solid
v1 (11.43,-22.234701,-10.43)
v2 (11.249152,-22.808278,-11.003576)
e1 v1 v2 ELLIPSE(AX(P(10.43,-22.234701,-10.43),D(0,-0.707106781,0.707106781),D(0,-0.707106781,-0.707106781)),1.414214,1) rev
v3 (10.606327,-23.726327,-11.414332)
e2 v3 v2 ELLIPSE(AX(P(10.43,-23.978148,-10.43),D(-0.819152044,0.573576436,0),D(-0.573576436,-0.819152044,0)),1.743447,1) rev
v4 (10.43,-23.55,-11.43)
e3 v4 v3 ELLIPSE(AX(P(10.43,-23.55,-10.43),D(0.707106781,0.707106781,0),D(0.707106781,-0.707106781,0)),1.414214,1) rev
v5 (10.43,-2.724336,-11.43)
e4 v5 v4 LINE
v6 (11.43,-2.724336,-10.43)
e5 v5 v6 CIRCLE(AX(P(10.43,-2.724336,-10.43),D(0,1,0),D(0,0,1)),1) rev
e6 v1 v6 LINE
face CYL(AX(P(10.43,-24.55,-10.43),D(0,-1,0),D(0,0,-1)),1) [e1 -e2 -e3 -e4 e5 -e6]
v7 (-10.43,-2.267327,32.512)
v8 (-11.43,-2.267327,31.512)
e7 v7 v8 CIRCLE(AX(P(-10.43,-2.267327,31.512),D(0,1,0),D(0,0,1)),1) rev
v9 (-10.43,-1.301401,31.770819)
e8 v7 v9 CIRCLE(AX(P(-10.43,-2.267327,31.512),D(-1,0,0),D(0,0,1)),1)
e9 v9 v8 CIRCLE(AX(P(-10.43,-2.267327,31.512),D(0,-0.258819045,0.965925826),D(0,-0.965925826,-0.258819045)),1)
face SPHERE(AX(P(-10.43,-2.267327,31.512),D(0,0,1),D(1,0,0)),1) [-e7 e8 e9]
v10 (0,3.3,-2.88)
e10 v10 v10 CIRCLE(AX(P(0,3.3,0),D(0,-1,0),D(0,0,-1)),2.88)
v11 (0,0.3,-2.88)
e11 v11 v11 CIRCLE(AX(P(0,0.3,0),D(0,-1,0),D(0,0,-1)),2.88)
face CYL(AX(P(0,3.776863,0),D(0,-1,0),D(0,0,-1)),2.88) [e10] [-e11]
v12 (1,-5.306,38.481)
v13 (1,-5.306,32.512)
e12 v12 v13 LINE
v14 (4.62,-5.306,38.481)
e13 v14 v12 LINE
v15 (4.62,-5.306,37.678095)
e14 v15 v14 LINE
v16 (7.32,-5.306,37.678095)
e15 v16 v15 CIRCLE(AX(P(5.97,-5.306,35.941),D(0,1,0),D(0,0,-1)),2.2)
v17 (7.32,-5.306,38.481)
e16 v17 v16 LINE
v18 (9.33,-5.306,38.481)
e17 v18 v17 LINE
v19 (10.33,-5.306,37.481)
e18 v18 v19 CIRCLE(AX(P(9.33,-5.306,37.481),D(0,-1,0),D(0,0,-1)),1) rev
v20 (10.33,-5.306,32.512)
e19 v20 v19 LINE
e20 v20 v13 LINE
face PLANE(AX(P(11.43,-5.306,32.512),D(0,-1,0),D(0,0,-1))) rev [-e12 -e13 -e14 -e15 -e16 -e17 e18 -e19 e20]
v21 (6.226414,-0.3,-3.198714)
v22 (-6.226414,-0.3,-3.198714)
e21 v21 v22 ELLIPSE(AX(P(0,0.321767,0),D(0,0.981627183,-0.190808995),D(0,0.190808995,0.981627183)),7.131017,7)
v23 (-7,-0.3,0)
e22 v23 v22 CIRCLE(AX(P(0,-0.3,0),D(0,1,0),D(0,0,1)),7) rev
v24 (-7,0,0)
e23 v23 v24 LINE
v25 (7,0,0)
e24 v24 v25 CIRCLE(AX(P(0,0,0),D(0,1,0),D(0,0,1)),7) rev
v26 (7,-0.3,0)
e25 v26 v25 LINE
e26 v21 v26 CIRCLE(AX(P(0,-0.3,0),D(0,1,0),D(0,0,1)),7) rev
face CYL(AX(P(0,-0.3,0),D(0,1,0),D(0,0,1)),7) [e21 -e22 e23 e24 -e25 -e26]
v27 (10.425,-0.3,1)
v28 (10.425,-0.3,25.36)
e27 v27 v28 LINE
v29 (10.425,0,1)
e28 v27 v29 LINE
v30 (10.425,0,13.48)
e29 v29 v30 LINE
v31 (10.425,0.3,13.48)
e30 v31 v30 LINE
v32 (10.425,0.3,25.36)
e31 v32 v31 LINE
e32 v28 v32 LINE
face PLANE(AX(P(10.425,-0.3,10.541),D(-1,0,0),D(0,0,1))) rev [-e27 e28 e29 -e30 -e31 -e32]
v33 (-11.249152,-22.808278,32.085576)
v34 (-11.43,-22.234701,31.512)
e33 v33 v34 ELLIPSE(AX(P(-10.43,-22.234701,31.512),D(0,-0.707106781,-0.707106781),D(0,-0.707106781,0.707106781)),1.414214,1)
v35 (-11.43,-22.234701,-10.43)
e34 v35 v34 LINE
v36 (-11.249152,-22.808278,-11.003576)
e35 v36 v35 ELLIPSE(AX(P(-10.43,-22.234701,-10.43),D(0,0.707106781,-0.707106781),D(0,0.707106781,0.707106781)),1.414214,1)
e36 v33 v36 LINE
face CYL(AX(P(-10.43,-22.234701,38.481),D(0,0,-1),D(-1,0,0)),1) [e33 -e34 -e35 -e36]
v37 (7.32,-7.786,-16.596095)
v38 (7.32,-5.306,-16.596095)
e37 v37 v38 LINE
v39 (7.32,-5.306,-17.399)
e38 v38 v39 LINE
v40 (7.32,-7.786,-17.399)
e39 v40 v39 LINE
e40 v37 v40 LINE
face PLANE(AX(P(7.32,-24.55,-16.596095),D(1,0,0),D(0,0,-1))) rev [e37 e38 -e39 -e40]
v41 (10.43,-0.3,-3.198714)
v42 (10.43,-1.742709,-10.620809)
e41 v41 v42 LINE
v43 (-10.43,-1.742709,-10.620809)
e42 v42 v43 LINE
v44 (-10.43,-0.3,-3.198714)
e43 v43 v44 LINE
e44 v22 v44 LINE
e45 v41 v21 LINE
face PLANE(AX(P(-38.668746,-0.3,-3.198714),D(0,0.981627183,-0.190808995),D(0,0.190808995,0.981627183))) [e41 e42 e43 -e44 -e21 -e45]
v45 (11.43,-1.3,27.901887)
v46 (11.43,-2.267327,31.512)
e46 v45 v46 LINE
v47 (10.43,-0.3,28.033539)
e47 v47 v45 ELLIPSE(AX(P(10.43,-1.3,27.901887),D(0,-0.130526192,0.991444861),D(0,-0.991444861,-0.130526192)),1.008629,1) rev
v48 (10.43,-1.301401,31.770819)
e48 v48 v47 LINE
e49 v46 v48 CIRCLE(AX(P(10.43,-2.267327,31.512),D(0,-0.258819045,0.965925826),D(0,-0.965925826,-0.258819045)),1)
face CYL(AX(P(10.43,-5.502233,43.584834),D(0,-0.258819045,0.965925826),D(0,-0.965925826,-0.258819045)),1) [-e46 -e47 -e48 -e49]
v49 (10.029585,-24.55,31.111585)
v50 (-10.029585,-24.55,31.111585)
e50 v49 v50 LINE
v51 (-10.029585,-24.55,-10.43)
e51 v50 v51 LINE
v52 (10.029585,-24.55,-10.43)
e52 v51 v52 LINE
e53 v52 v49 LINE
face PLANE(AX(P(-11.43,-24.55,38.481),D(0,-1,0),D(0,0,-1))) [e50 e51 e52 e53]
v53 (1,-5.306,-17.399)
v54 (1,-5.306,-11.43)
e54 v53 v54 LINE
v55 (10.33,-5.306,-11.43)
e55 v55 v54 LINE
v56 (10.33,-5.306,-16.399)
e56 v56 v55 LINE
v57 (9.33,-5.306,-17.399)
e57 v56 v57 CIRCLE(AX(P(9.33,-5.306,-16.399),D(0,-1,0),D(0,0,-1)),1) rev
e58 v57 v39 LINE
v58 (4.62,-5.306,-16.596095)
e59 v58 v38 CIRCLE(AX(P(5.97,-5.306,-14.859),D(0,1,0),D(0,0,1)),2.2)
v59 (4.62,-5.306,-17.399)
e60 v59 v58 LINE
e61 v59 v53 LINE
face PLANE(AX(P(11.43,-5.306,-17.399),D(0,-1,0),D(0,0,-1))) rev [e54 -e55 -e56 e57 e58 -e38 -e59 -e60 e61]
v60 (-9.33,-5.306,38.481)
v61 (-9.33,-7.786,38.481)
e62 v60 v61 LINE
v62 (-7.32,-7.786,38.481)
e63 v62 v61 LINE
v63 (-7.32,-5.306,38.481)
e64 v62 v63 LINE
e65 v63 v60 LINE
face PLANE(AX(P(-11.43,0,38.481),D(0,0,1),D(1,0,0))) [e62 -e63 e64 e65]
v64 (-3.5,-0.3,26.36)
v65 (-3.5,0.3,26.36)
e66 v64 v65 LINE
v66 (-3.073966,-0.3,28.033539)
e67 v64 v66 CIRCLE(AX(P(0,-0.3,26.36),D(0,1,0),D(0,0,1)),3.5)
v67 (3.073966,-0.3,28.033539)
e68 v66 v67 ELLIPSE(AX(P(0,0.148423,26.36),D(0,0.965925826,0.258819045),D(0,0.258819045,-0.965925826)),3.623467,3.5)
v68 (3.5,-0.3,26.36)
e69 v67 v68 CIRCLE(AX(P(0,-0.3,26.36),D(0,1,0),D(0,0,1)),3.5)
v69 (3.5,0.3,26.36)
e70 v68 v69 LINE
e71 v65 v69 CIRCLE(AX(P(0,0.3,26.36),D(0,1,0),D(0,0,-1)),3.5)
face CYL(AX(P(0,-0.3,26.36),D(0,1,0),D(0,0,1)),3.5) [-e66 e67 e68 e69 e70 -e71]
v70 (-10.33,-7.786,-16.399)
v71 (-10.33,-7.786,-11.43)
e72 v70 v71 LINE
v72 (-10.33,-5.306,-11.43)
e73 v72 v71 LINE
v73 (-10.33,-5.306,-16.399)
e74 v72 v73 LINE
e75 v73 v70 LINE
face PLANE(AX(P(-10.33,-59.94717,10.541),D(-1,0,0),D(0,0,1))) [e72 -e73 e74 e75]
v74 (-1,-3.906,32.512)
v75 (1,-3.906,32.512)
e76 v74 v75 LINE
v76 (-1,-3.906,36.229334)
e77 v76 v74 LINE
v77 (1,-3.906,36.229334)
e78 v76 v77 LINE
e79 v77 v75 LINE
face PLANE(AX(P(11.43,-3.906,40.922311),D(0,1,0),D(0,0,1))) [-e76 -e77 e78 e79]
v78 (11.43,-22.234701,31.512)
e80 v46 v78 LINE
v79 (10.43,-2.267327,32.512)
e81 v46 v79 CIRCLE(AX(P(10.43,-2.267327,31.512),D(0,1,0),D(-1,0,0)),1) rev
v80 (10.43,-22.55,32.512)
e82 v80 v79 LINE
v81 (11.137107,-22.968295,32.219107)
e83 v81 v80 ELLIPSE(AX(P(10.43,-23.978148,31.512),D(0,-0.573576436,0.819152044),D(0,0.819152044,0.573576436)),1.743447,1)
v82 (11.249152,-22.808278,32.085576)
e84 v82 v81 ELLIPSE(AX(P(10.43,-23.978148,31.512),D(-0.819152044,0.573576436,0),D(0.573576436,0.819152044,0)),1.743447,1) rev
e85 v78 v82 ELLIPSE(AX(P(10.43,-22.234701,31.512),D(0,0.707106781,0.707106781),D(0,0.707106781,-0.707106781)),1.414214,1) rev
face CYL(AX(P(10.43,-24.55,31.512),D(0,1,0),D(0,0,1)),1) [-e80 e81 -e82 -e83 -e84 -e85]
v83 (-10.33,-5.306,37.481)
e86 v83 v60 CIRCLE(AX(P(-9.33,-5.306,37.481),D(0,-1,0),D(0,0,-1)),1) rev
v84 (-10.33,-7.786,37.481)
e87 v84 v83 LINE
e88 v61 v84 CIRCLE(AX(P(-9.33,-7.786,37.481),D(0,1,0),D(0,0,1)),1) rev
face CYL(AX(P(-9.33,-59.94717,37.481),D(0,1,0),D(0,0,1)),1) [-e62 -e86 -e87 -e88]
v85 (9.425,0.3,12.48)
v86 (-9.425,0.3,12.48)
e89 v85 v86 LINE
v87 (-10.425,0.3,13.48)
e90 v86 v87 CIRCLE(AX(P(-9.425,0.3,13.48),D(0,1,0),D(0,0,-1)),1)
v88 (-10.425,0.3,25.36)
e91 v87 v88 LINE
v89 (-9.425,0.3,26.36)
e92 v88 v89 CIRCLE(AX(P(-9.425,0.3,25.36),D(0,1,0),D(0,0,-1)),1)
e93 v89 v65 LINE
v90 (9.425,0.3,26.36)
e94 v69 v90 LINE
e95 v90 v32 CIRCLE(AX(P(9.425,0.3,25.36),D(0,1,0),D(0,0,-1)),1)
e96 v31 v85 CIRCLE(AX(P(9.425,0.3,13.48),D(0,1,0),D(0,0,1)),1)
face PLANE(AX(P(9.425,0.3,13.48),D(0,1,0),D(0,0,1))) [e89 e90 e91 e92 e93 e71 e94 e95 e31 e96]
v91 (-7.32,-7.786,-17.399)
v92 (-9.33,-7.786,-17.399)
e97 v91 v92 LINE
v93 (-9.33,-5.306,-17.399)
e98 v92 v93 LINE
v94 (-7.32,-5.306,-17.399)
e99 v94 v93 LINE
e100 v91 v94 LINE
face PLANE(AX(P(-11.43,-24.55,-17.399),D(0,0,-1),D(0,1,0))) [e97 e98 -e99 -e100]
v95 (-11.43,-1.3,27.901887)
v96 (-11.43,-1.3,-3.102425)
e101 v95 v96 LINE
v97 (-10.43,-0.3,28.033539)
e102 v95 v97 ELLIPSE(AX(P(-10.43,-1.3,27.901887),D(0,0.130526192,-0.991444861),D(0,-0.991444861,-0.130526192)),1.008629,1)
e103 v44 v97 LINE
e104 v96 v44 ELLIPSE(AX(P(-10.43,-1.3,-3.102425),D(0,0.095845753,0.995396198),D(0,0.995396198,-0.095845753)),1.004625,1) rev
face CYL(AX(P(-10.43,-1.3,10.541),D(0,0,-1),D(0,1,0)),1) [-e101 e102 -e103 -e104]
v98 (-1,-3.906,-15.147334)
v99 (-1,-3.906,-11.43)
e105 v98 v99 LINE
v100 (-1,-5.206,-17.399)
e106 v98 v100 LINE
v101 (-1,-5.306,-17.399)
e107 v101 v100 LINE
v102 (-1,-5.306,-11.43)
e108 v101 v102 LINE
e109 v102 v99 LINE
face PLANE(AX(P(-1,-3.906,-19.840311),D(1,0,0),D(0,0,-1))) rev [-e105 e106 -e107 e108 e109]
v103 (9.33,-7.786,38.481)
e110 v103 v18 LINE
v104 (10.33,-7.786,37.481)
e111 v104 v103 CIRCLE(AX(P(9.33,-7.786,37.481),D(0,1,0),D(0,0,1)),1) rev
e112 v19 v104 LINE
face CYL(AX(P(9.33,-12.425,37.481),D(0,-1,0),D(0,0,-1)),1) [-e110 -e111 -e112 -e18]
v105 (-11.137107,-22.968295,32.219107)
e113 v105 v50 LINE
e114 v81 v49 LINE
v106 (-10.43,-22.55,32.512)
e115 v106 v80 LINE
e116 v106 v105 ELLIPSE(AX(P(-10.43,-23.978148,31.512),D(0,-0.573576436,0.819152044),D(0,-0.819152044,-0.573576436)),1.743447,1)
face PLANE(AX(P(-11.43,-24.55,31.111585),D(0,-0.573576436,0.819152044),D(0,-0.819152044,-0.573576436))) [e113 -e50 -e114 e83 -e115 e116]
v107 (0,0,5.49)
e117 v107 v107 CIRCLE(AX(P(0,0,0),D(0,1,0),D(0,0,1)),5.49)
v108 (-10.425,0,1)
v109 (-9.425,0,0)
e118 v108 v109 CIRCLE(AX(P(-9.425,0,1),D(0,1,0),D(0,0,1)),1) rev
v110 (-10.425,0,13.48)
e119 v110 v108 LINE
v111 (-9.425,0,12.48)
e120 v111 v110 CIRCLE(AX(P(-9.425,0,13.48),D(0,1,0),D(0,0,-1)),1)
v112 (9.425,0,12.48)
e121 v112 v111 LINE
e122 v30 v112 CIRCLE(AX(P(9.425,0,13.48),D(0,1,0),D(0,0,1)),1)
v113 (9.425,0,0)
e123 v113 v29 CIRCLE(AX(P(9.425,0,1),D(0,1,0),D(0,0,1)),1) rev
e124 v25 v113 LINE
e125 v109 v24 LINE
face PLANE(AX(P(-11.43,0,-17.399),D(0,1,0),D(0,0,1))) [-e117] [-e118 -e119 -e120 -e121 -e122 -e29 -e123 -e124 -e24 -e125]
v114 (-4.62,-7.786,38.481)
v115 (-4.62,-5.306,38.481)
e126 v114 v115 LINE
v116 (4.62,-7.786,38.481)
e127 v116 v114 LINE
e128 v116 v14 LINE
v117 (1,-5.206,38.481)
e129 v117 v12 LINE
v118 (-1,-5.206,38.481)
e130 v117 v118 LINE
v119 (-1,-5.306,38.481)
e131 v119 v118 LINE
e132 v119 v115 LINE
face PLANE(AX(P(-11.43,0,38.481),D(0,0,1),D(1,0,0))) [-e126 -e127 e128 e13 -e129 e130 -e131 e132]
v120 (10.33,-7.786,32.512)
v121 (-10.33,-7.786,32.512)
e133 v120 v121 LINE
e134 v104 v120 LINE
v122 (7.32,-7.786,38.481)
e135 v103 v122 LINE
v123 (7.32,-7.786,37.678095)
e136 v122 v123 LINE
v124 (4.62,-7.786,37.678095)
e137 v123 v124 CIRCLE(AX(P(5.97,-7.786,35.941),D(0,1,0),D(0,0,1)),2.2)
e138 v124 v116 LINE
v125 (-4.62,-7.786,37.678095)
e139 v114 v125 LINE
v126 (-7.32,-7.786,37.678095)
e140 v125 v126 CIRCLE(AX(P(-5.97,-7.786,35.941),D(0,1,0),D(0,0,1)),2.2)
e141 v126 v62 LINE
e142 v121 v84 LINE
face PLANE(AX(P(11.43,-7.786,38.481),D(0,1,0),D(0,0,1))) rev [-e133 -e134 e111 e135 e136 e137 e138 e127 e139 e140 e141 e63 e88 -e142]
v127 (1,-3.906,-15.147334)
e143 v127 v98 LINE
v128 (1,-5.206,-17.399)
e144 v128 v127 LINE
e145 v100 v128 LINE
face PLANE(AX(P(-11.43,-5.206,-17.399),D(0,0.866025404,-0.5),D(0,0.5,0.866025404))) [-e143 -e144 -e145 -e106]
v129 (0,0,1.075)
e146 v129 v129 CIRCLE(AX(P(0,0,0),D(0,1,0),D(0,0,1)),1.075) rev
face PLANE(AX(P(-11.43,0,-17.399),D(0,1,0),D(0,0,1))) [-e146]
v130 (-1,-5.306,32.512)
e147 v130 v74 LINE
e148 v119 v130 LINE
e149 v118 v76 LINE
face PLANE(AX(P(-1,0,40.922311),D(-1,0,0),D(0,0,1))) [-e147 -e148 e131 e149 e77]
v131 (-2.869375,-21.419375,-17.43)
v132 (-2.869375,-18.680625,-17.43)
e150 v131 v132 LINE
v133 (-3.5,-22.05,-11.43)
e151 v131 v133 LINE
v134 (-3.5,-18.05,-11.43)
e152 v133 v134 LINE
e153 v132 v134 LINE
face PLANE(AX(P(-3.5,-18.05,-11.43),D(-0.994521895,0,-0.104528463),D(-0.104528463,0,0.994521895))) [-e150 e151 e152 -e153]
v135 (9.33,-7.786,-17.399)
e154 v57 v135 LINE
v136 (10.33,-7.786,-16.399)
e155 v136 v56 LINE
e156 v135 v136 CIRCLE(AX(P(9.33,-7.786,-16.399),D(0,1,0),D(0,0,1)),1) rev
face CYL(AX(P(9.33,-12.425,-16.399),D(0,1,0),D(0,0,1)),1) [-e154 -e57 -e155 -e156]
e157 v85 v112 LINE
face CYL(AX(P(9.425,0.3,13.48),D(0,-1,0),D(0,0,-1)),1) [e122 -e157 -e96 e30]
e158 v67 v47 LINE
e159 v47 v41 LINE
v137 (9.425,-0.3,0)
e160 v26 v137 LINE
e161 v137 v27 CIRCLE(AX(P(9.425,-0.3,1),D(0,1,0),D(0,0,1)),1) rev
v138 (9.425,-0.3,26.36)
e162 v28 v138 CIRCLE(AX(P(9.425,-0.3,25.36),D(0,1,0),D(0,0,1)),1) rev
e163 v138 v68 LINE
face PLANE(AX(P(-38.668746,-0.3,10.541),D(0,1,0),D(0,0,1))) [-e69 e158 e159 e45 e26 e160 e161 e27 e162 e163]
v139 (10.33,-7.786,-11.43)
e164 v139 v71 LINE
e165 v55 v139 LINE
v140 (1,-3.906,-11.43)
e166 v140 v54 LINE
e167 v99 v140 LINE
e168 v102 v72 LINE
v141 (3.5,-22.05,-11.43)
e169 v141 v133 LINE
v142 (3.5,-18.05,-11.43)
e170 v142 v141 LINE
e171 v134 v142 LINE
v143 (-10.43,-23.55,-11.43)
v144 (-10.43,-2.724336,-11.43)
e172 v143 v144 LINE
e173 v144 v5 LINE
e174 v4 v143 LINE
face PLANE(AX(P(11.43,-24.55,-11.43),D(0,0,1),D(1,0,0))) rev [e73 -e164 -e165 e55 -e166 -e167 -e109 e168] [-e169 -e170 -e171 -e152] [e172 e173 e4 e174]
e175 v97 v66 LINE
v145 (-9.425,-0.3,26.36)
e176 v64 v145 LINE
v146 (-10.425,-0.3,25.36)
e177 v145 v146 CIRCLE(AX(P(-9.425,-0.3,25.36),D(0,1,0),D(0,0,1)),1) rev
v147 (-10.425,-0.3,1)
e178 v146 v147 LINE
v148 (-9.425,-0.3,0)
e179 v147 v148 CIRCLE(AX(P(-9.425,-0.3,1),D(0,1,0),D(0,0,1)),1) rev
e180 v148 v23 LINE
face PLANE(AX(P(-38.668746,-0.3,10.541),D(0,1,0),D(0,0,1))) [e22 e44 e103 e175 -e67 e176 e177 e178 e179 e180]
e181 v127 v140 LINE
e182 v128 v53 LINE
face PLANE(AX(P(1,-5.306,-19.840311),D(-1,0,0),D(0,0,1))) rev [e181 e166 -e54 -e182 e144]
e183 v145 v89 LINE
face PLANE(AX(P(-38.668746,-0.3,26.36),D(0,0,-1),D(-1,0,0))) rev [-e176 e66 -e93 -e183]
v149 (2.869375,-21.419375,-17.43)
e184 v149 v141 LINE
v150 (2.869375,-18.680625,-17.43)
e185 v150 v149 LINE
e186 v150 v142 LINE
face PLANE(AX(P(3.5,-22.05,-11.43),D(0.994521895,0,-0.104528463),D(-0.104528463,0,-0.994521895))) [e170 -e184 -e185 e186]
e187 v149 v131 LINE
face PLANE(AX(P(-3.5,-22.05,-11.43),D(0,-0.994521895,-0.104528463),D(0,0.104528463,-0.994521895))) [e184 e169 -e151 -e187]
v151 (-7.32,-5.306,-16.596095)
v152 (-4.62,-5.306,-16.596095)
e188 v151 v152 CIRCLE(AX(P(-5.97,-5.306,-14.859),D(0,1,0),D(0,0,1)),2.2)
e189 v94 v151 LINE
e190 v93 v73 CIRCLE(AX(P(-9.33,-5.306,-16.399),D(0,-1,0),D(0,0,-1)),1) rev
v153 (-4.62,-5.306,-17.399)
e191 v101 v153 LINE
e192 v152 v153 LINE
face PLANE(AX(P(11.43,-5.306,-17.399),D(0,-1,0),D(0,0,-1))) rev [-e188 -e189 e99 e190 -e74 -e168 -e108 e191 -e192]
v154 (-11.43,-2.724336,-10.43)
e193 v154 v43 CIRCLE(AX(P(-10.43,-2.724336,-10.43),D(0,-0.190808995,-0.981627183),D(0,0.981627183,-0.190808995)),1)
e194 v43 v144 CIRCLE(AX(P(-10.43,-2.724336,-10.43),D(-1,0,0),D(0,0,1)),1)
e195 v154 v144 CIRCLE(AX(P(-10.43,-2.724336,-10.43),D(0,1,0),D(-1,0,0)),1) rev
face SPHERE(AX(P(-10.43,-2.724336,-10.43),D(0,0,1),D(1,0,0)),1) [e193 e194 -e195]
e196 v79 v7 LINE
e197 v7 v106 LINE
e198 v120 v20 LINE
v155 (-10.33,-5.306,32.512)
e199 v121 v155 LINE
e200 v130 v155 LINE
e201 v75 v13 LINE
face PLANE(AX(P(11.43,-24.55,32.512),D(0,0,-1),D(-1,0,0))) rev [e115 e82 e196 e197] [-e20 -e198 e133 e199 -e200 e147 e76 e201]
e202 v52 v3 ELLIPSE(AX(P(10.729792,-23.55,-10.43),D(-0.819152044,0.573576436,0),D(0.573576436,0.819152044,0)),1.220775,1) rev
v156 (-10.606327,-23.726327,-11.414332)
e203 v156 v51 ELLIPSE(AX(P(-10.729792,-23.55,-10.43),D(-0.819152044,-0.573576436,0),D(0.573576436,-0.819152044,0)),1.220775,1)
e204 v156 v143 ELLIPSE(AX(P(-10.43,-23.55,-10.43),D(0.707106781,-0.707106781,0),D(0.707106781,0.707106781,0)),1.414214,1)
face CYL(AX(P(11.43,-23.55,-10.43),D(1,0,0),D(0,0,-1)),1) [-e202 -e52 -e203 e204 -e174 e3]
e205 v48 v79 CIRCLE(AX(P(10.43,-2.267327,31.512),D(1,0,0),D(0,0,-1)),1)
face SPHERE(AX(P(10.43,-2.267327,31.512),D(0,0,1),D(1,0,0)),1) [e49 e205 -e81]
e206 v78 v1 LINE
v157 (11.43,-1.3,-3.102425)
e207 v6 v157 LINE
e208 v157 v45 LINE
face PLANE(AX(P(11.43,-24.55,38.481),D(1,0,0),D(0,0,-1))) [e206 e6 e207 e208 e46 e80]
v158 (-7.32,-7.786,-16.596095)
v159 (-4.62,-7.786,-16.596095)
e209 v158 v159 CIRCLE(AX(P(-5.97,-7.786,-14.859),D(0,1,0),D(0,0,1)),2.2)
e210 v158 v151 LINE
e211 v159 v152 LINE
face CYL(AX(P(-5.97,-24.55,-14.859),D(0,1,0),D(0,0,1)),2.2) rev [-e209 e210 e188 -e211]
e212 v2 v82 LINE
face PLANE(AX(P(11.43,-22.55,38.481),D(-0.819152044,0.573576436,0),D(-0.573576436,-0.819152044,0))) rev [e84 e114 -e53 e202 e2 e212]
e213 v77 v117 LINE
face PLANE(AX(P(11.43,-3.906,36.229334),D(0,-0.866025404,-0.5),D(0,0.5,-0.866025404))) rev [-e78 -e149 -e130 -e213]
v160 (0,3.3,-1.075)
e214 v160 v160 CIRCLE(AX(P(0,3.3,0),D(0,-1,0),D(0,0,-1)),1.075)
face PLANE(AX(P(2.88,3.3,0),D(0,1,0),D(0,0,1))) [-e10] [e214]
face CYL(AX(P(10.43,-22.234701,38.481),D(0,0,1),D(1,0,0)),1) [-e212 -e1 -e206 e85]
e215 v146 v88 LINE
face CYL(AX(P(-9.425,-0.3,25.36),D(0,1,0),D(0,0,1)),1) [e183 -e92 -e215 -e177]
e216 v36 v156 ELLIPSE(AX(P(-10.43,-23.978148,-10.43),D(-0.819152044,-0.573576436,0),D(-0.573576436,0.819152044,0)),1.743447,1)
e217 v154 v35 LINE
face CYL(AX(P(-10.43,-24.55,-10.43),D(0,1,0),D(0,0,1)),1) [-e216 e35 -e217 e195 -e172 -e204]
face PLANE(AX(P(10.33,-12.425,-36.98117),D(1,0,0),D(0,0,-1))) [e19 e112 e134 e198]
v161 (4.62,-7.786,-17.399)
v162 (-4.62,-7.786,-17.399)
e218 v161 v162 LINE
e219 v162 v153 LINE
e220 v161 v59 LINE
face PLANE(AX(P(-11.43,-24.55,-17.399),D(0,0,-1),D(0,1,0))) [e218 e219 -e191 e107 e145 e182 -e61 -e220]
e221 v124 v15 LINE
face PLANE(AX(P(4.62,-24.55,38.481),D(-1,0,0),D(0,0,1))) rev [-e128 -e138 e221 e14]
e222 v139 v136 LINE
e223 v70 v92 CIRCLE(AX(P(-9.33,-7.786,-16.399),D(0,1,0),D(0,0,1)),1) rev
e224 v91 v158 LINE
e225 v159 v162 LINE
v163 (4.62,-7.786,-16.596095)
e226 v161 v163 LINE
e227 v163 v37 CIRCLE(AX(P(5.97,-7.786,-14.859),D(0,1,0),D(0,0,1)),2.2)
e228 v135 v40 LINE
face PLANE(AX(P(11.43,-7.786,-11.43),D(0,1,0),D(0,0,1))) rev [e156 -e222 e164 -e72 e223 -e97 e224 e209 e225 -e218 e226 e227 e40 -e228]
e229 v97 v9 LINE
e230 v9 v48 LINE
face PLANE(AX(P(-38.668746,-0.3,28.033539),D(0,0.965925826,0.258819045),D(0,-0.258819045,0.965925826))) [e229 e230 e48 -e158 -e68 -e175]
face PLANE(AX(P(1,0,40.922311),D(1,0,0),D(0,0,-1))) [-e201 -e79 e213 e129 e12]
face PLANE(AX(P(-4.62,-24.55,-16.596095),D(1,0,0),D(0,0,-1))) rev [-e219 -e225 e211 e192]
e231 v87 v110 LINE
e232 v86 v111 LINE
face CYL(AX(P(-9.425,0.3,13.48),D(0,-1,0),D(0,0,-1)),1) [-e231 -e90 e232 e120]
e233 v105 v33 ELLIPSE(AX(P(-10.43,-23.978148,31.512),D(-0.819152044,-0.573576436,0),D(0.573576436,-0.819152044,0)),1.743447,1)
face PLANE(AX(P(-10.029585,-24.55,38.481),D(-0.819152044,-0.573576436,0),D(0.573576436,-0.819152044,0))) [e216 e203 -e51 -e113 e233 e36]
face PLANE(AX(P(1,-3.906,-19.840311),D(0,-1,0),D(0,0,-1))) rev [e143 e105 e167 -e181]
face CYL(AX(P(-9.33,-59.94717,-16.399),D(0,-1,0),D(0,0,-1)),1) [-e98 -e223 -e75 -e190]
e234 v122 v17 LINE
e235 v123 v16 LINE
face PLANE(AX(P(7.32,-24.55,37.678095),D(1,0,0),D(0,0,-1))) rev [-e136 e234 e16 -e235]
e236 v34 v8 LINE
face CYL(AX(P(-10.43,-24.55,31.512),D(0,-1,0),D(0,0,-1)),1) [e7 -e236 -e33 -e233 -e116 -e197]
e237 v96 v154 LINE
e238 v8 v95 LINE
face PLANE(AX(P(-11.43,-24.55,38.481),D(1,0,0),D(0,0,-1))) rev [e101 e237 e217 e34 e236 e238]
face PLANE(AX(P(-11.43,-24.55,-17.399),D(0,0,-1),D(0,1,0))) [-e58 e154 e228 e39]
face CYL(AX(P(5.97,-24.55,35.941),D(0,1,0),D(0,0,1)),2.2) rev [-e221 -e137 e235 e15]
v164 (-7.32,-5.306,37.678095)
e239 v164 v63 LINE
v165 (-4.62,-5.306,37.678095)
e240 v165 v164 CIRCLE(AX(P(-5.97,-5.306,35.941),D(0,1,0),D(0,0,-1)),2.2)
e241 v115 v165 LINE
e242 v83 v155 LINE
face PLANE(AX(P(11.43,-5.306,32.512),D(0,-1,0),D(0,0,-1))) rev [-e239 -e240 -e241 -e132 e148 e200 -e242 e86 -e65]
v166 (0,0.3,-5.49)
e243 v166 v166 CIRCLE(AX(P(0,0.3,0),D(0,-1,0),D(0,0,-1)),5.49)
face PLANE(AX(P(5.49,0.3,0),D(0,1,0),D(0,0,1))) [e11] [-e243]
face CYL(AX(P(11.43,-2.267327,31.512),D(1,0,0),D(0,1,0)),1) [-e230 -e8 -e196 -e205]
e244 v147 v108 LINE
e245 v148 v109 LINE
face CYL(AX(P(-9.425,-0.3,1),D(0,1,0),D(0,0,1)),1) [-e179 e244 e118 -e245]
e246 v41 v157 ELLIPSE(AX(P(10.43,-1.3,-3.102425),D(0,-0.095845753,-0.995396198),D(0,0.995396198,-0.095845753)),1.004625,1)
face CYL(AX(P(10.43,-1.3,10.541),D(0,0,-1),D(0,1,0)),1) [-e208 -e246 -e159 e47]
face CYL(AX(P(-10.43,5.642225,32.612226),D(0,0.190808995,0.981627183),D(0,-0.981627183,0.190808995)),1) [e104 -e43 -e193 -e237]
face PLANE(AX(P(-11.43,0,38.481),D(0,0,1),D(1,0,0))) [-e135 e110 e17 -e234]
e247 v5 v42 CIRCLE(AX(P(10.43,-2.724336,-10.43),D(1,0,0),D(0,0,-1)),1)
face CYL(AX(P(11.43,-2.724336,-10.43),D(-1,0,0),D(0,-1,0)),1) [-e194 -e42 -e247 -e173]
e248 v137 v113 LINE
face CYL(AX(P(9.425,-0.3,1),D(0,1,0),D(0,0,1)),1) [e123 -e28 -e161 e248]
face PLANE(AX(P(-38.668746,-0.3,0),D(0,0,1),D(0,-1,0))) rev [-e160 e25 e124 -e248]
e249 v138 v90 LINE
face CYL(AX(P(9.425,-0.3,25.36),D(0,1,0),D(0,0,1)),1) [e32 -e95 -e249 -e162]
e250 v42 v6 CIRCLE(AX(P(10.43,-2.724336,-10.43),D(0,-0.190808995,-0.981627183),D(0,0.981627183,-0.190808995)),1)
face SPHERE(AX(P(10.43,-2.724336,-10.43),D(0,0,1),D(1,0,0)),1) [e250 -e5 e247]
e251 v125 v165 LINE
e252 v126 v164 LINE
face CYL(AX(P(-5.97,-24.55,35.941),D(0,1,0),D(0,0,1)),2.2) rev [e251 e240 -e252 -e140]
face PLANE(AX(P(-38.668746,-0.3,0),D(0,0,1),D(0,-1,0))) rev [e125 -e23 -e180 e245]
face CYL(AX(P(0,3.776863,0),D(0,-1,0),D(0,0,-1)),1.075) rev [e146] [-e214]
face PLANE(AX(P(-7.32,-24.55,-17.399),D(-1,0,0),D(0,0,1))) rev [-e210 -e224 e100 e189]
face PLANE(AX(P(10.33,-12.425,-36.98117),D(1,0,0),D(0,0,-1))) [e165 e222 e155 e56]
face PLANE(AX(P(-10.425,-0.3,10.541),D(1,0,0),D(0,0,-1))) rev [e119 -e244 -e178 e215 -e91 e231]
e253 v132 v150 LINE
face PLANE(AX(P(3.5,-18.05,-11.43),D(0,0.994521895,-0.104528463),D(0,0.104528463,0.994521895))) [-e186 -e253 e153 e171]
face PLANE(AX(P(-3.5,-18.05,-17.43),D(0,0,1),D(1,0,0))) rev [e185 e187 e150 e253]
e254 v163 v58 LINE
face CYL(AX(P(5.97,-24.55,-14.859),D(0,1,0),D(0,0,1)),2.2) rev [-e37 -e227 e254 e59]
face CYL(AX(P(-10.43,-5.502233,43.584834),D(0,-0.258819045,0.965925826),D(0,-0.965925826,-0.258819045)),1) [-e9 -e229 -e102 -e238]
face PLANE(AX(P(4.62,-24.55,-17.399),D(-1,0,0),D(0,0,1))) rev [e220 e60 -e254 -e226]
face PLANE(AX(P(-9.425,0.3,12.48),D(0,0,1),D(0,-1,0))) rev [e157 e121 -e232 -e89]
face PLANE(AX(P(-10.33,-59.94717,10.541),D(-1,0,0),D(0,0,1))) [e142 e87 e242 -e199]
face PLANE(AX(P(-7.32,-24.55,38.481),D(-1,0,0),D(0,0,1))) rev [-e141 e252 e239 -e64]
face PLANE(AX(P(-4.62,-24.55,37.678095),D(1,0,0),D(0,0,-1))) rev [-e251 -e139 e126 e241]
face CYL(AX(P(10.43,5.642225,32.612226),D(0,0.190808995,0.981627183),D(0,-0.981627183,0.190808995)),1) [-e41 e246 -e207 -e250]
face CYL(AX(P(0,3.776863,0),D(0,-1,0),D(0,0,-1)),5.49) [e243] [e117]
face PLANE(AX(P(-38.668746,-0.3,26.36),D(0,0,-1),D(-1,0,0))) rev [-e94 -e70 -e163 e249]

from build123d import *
from OCP.BRepFilletAPI import BRepFilletAPI_MakeChamfer

# Parameters (mm, degrees)
SKETCH_1_W           = 55.88
SKETCH_1_H           = 24.55
EXTRUDE_1_DEPTH      = 22.86
SKETCH_2_W           = 5.969
SKETCH_2_H           = 16.764
CUT_EXTRUDE_1_DEPTH  = 52.049676404
SKETCH_3_W           = 5.969
SKETCH_3_H           = 5.306
CUT_EXTRUDE_2_DEPTH  = 52.049676404
SKETCH_7_W           = 2
SKETCH_7_H           = 1.4
EXTRUDE_2_DEPTH      = 5.969
EXTRUDE_START        = -43.942
SKETCH_7_2_W         = 2
SKETCH_7_2_H         = 1.4
EXTRUDE_5_DEPTH      = 5.969
CUT_EXTRUDE_4_DEPTH  = 45.517005706
SKETCH_12_W          = 7
SKETCH_12_H          = 4
EXTRUDE_4_DEPTH      = 6
EXTRUDE_4_TAPER      = 6
CHAMFER_1_SIZE       = 1.3
CHAMFER_1_SIZE2      = 2.25166605
SKETCH_18_W          = 22.86
SKETCH_18_H          = 43.942
CUT_EXTRUDE_9_DEPTH  = 0.3
EXTRUDE_START_2      = 0.3
EXTRUDE_6_DEPTH      = 0.3
SKETCH_20_W          = 5.969
SKETCH_20_H          = 2.48
CUT_EXTRUDE_10_DEPTH = 1.1
SKETCH_21_W          = 5.969
SKETCH_21_H          = 2.48
CUT_EXTRUDE_11_DEPTH = 1.1
CHAMFER_3_SIZE       = 1.6
CHAMFER_3_SIZE_2     = 8.231286426
CHAMFER_4_SIZE       = 1.2
CHAMFER_4_SIZE_2     = 4.478460969
CHAMFER_5_SIZE       = 2
CHAMFER_5_SIZE2      = 1.400415076
FILLET_1_R           = 1


with BuildPart() as part:
    # Эскиз1 → Бобышка-Вытянуть1 (new body)
    with BuildSketch(Plane(origin=(11.43, 0, 0), x_dir=(0, 0, -1), z_dir=(1, 0, 0))):
        with Locations((-10.541, -12.275)):
            Rectangle(SKETCH_1_W, SKETCH_1_H)
    extrude(amount=-EXTRUDE_1_DEPTH)

    # Эскиз2 → Вырез-Вытянуть1 (cut, through all)
    with BuildSketch(Plane.ZY.offset(11.43)):
        with Locations((-14.4145, -16.168)):
            Rectangle(SKETCH_2_W, SKETCH_2_H)
        with Locations((35.4965, -16.168)):
            Rectangle(SKETCH_2_W, SKETCH_2_H)
    extrude(amount=-CUT_EXTRUDE_1_DEPTH, mode=Mode.SUBTRACT)

    # Эскиз3 → Вырез-Вытянуть2 (cut, through all)
    with BuildSketch(Plane.ZY.offset(11.43)):
        with Locations((-14.4145, -2.653)):
            Rectangle(SKETCH_3_W, SKETCH_3_H)
        with Locations((35.4965, -2.653)):
            Rectangle(SKETCH_3_W, SKETCH_3_H)
    extrude(amount=-CUT_EXTRUDE_2_DEPTH, mode=Mode.SUBTRACT)

    # Эскиз7 → Бобышка-Вытянуть2 (add)
    with BuildSketch(Plane(origin=(0, 0, -11.43), x_dir=(-1, 0, 0), z_dir=(0, 0, -1))):
        with Locations((0, -4.606)):
            Rectangle(SKETCH_7_W, SKETCH_7_H)
    extrude(amount=EXTRUDE_2_DEPTH)

    # Эскиз7<2> → Бобышка-Вытянуть5 (add)
    with BuildSketch(Plane(origin=(0, 0, -11.43), x_dir=(-1, 0, 0), z_dir=(0, 0, -1)).offset(EXTRUDE_START)):
        with Locations((0, -4.606)):
            Rectangle(SKETCH_7_2_W, SKETCH_7_2_H)
    extrude(amount=-EXTRUDE_5_DEPTH)

    # Эскиз5 → Вырез-Вытянуть4 (cut, through all)
    with BuildSketch(Plane(origin=(0, -5.306, 0), x_dir=(-1, 0, 0), z_dir=(0, 1, 0))):
        with BuildLine():
            Line((4.62, -17.399), (7.32, -17.399))
            Line((7.32, -17.399), (7.32, -16.596095277))
            ThreePointArc((7.32, -16.596095277), (5.97, -12.659), (4.62, -16.596095277))
            Line((4.62, -16.596095277), (4.62, -17.399))
        make_face()
        with BuildLine():
            Line((-7.32, -17.399), (-4.62, -17.399))
            Line((-4.62, -17.399), (-4.62, -16.596095277))
            ThreePointArc((-4.62, -16.596095277), (-5.97, -12.659), (-7.32, -16.596095277))
            Line((-7.32, -16.596095277), (-7.32, -17.399))
        make_face()
        with BuildLine():
            Line((-7.32, 37.678095277), (-7.32, 38.481))
            Line((-7.32, 38.481), (-4.62, 38.481))
            Line((-4.62, 38.481), (-4.62, 37.678095277))
            ThreePointArc((-4.62, 37.678095277), (-5.97, 33.741), (-7.32, 37.678095277))
        make_face()
        with BuildLine():
            Line((4.62, 37.678095277), (4.62, 38.481))
            Line((4.62, 38.481), (7.32, 38.481))
            Line((7.32, 38.481), (7.32, 37.678095277))
            ThreePointArc((7.32, 37.678095277), (5.97, 33.741), (4.62, 37.678095277))
        make_face()
    extrude(amount=-CUT_EXTRUDE_4_DEPTH, mode=Mode.SUBTRACT)

    # Эскиз12 → Бобышка-Вытянуть4 (add)
    with BuildSketch(Plane(origin=(0, 0, -11.43), x_dir=(-1, 0, 0), z_dir=(0, 0, -1))):
        with Locations((0, -20.05)):
            Rectangle(SKETCH_12_W, SKETCH_12_H)
    extrude(amount=EXTRUDE_4_DEPTH, taper=EXTRUDE_4_TAPER)

    # Эскиз13 → Повернуть1 (revolve)
    with BuildSketch(Plane.XY, mode=Mode.PRIVATE) as revolve_1_sk:
        Polygon((2.88, 3.3), (1.075, 3.3), (1.075, 0), (5.49, 0), (5.49, 0.3), (2.88, 0.3), align=None)
    revolve(revolve_1_sk.sketch.rotate(Axis((0, 3.776863246, 0), (0, -1, 0)), 270), axis=Axis((0, 3.776863246, 0), (0, -1, 0)))

    # Фаска1: one chamfer whose edges measure the first distance from different faces: ONE call of the kernel's chamfer builder (chamfer() names one face for all edges)
    chamfer_1_edges_1 = [part.edges().sort_by_distance(p)[0] for p in [
        (0, -3.906, -17.399),
    ]]
    chamfer_1_side_1 = [part.faces().sort_by_distance(p)[0] for p in [
        (0, -6.334763066, -17.399),
    ]]
    chamfer_1_edges_2 = [part.edges().sort_by_distance(p)[0] for p in [
        (0, -3.906, 38.481),
    ]]
    chamfer_1_side_2 = [part.faces().sort_by_distance(p)[0] for p in [
        (0, -6.334763066, 38.481),
    ]]
    chamfer_1 = BRepFilletAPI_MakeChamfer(part.part.solid().wrapped)
    for e in chamfer_1_edges_1:
        chamfer_1.Add(CHAMFER_1_SIZE, CHAMFER_1_SIZE2, e.wrapped, chamfer_1_side_1[0].wrapped)  # the first distance lies on this face
    for e in chamfer_1_edges_2:
        chamfer_1.Add(CHAMFER_1_SIZE, CHAMFER_1_SIZE2, e.wrapped, chamfer_1_side_2[0].wrapped)  # the first distance lies on this face
    add(Compound.cast(chamfer_1.Shape()), mode=Mode.REPLACE)

    # Эскиз18 → Вырез-Вытянуть9 (cut)
    with BuildSketch(Plane(origin=(0, 0, 0), x_dir=(1, 0, 0), z_dir=(0, 1, 0))):
        with Locations((0, -10.541)):
            Rectangle(SKETCH_18_W, SKETCH_18_H)
        with BuildLine():
            Line((-10.425, -25.36), (-10.425, -1))
            ThreePointArc((-10.425, -1), (-10.132106781, -0.292893219), (-9.425, 0))
            Line((-9.425, 0), (-7, 0))
            ThreePointArc((-7, 0), (0, 7), (7, 0))
            Line((7, 0), (9.425, 0))
            ThreePointArc((9.425, 0), (10.132106781, -0.292893219), (10.425, -1))
            Line((10.425, -1), (10.425, -25.36))
            ThreePointArc((10.425, -25.36), (10.132106781, -26.067106781), (9.425, -26.36))
            Line((9.425, -26.36), (3.5, -26.36))
            ThreePointArc((3.5, -26.36), (0, -29.86), (-3.5, -26.36))
            Line((-3.5, -26.36), (-9.425, -26.36))
            ThreePointArc((-9.425, -26.36), (-10.132106781, -26.067106781), (-10.425, -25.36))
        make_face(mode=Mode.SUBTRACT)
    extrude(amount=-CUT_EXTRUDE_9_DEPTH, mode=Mode.SUBTRACT)

    # Эскиз19 → Бобышка-Вытянуть6 (add)
    with BuildSketch(Plane(origin=(0, 0, 0), x_dir=(1, 0, 0), z_dir=(0, 1, 0)).offset(EXTRUDE_START_2)):
        with BuildLine():
            Line((-9.425, -12.48), (9.425, -12.48))
            ThreePointArc((9.425, -12.48), (10.132106781, -12.772893219), (10.425, -13.48))
            Line((10.425, -13.48), (10.425, -25.36))
            ThreePointArc((10.425, -25.36), (10.132106781, -26.067106781), (9.425, -26.36))
            Line((9.425, -26.36), (3.5, -26.36))
            ThreePointArc((3.5, -26.36), (0, -29.86), (-3.5, -26.36))
            Line((-3.5, -26.36), (-9.425, -26.36))
            ThreePointArc((-9.425, -26.36), (-10.132106781, -26.067106781), (-10.425, -25.36))
            Line((-10.425, -25.36), (-10.425, -13.48))
            ThreePointArc((-10.425, -13.48), (-10.132106781, -12.772893219), (-9.425, -12.48))
        make_face()
    extrude(amount=-EXTRUDE_6_DEPTH)

    # Эскиз20 → Вырез-Вытянуть10 (cut)
    with BuildSketch(Plane(origin=(11.43, 0, 0), x_dir=(0, 0, -1), z_dir=(1, 0, 0))):
        with Locations((-35.4965, -6.546)):
            Rectangle(SKETCH_20_W, SKETCH_20_H)
        with Locations((14.4145, -6.546)):
            Rectangle(SKETCH_20_W, SKETCH_20_H)
    extrude(amount=-CUT_EXTRUDE_10_DEPTH, mode=Mode.SUBTRACT)

    # Эскиз21 → Вырез-Вытянуть11 (cut)
    with BuildSketch(Plane.ZY.offset(11.43)):
        with Locations((-14.4145, -6.546)):
            Rectangle(SKETCH_21_W, SKETCH_21_H)
        with Locations((35.4965, -6.546)):
            Rectangle(SKETCH_21_W, SKETCH_21_H)
    extrude(amount=-CUT_EXTRUDE_11_DEPTH, mode=Mode.SUBTRACT)

    # Фаска3
    # the kernel refuses this chamfer: 8.231286426, 1.6 mm, written as the material it takes off along each edge
    with BuildSketch(Plane(origin=(32.816798232, -0.3, -11.43), x_dir=(0, -0.9816291836389957, -0.19079870499623175), z_dir=(-1, 0, 0))) as chamfer_3_piece_1_section:
        Polygon((CHAMFER_3_SIZE * 0.981629183639, CHAMFER_3_SIZE * 0.190798704996), (-CHAMFER_3_SIZE_2 * 0.190798704986, CHAMFER_3_SIZE_2 * 0.981629183586), (0, 0), align=None)
    chamfer_3_piece_1 = extrude(amount=65.633596465, mode=Mode.PRIVATE)
    chamfer_3_piece_1 = chamfer_3_piece_1 - Plane(origin=(0, -0.754444143, 0), x_dir=(-1, 0, 0), z_dir=(0, 1, 0)) * Cylinder(7, 164, mode=Mode.PRIVATE)
    add(chamfer_3_piece_1, mode=Mode.SUBTRACT)

    # Фаска4
    # the kernel refuses this chamfer: 4.478460969, 1.2 mm, written as the material it takes off along each edge
    with BuildSketch(Plane(origin=(-23.0593162, -0.3, 32.512), x_dir=(0, -0.9905000388259542, 0.13751244702129095), z_dir=(1, 0, 0))) as chamfer_4_piece_1_section:
        Polygon((CHAMFER_4_SIZE * 0.990500038826, CHAMFER_4_SIZE * 0.137512447021), (-CHAMFER_4_SIZE_2 * 0.137512447024, CHAMFER_4_SIZE_2 * 0.990500038844), (0, 0), align=None)
    chamfer_4_piece_1 = extrude(amount=46.118632399, mode=Mode.PRIVATE)
    chamfer_4_piece_1 = chamfer_4_piece_1 - Plane(origin=(0, -0.658812449, 26.36), x_dir=(1, 0, 0), z_dir=(0, 1, 0)) * Cylinder(3.5, 110, mode=Mode.PRIVATE)
    add(chamfer_4_piece_1, mode=Mode.SUBTRACT)

    # Фаска5: one chamfer whose edges measure the first distance from different faces: ONE call of the kernel's chamfer builder (chamfer() names one face for all edges)
    chamfer_5_edges_1 = [part.edges().sort_by_distance(p)[0] for p in [
        (11.43, -24.55, 10.541),
    ]]
    chamfer_5_side_1 = [part.faces().sort_by_distance(p)[0] for p in [
        (11.43, -12.527087713, 10.608768659),
    ]]
    chamfer_5_edges_2 = [part.edges().sort_by_distance(p)[0] for p in [
        (-11.43, -24.55, 10.541),
    ]]
    chamfer_5_side_2 = [part.faces().sort_by_distance(p)[0] for p in [
        (-11.43, -12.527087713, 10.608768659),
    ]]
    chamfer_5_edges_3 = [part.edges().sort_by_distance(p)[0] for p in [
        (0, -24.55, 32.512),
    ]]
    chamfer_5_side_3 = [part.faces().sort_by_distance(p)[0] for p in [
        (0, -13.776843524, 32.512),
    ]]
    chamfer_5 = BRepFilletAPI_MakeChamfer(part.part.solid().wrapped)
    for e in chamfer_5_edges_1:
        chamfer_5.Add(CHAMFER_5_SIZE, CHAMFER_5_SIZE2, e.wrapped, chamfer_5_side_1[0].wrapped)  # the first distance lies on this face
    for e in chamfer_5_edges_2:
        chamfer_5.Add(CHAMFER_5_SIZE, CHAMFER_5_SIZE2, e.wrapped, chamfer_5_side_2[0].wrapped)  # the first distance lies on this face
    for e in chamfer_5_edges_3:
        chamfer_5.Add(CHAMFER_5_SIZE, CHAMFER_5_SIZE2, e.wrapped, chamfer_5_side_3[0].wrapped)  # the first distance lies on this face
    add(Compound.cast(chamfer_5.Shape()), mode=Mode.REPLACE)

    # Скругление1
    # the kernel refuses this fillet: 1 mm, written as the material it takes off along each edge
    with BuildSketch(Plane(origin=(10.43, -2.724336386, -10.43), x_dir=(0, 0, -1), z_dir=(1, 0, 0))) as fillet_1_piece_1_section:
        Polygon((0, 0), (FILLET_1_R, 0), (FILLET_1_R, FILLET_1_R * 0.824336385817), (FILLET_1_R * 0.190808995377, FILLET_1_R * 0.981627183448), align=None)
    fillet_1_piece_1 = extrude(amount=FILLET_1_R, mode=Mode.PRIVATE)
    fillet_1_piece_1 = fillet_1_piece_1 - Plane(origin=(10.43, -2.724336386, -10.43), x_dir=(0, -0.6360782202776851, 0.771624583387785), z_dir=(1, 0, 0)) * Sphere(FILLET_1_R, mode=Mode.PRIVATE)
    add(fillet_1_piece_1, mode=Mode.SUBTRACT)
    with BuildSketch(Plane(origin=(-10.43, -2.724336386, -10.43), x_dir=(0, 0, -1), z_dir=(-1, 0, 0))) as fillet_1_piece_2_section:
        Polygon((0, 0), (FILLET_1_R, 0), (FILLET_1_R, -FILLET_1_R * 0.824336385817), (FILLET_1_R * 0.190808995377, -FILLET_1_R * 0.981627183448), align=None)
    fillet_1_piece_2 = extrude(amount=FILLET_1_R, mode=Mode.PRIVATE)
    fillet_1_piece_2 = fillet_1_piece_2 - Plane(origin=(-10.43, -2.724336386, -10.43), x_dir=(0, -0.6360782202776851, 0.771624583387785), z_dir=(-1, 0, 0)) * Sphere(FILLET_1_R, mode=Mode.PRIVATE)
    add(fillet_1_piece_2, mode=Mode.SUBTRACT)
    with BuildSketch(Plane(origin=(-10.43, -2.267326988, 31.512), x_dir=(0, 0.9659258262889346, 0.25881904510301973), z_dir=(-1, 0, 0))) as fillet_1_piece_3_section:
        Polygon((0, 0), (FILLET_1_R, 0), (FILLET_1_R, -FILLET_1_R * 0.767326987979), (FILLET_1_R * 0.258819045103, -FILLET_1_R * 0.965925826289), align=None)
    fillet_1_piece_3 = extrude(amount=FILLET_1_R, mode=Mode.PRIVATE)
    fillet_1_piece_3 = fillet_1_piece_3 - Plane(origin=(-10.43, -2.267326988, 31.512), x_dir=(0, -0.6087614290085158, -0.7933533402913924), z_dir=(-1, 0, 0)) * Sphere(FILLET_1_R, mode=Mode.PRIVATE)
    add(fillet_1_piece_3, mode=Mode.SUBTRACT)
    with BuildSketch(Plane(origin=(10.43, -2.267326988, 31.512), x_dir=(0, 0, 1), z_dir=(1, 0, 0))) as fillet_1_piece_4_section:
        Polygon((0, 0), (FILLET_1_R, 0), (FILLET_1_R, -FILLET_1_R * 0.767326987979), (FILLET_1_R * 0.258819045103, -FILLET_1_R * 0.965925826289), align=None)
    fillet_1_piece_4 = extrude(amount=FILLET_1_R, mode=Mode.PRIVATE)
    fillet_1_piece_4 = fillet_1_piece_4 - Plane(origin=(10.43, -2.267326988, 31.512), x_dir=(0, -0.6087614290085158, -0.7933533402913924), z_dir=(1, 0, 0)) * Sphere(FILLET_1_R, mode=Mode.PRIVATE)
    add(fillet_1_piece_4, mode=Mode.SUBTRACT)
    with BuildSketch(Plane(origin=(11.43, -25.05, -11.43), x_dir=(0, 0, 1), z_dir=(0, 1, 0)), Plane(origin=(-11.43, -2.724336386, -11.43), x_dir=(0, 0, 1), z_dir=(0, -1, 0))) as fillet_1_piece_5:
        with BuildLine():
            CenterArc((FILLET_1_R, -FILLET_1_R), FILLET_1_R, 90, 90)
            Line((0, -FILLET_1_R), (0, 0))
            Line((0, 0), (FILLET_1_R, 0))
        make_face()
    extrude(amount=22.325663614, mode=Mode.SUBTRACT)
    with BuildSketch(Plane(origin=(-11.43, -2.267326988, 32.512), x_dir=(1, 0, 0), z_dir=(0, -1, 0)), Plane(origin=(11.43, -25.05, 32.512), x_dir=(-1, 0, 0), z_dir=(0, 1, 0))) as fillet_1_piece_6:
        with BuildLine():
            CenterArc((FILLET_1_R, -FILLET_1_R), FILLET_1_R, 90, 90)
            Line((0, -FILLET_1_R), (0, 0))
            Line((0, 0), (FILLET_1_R, 0))
        make_face()
    extrude(amount=22.782673012, mode=Mode.SUBTRACT)
    with BuildSketch(Plane(origin=(10.33, -2.806, 38.481), x_dir=(0, 0, -1), z_dir=(0, -1, 0)), Plane(origin=(10.33, -10.286, -17.399), x_dir=(0, 0, 1), z_dir=(0, 1, 0))) as fillet_1_piece_7:
        with BuildLine():
            CenterArc((FILLET_1_R, -FILLET_1_R), FILLET_1_R, 90, 90)
            Line((0, -FILLET_1_R), (0, 0))
            Line((0, 0), (FILLET_1_R, 0))
        make_face()
    extrude(amount=7.48, mode=Mode.SUBTRACT)
    with BuildSketch(Plane(origin=(-10.33, -2.806, 38.481), x_dir=(0, 0, -1), z_dir=(0, -1, 0)), Plane(origin=(-10.33, -10.286, -17.399), x_dir=(0, 0, 1), z_dir=(0, 1, 0))) as fillet_1_piece_8:
        with BuildLine():
            CenterArc((FILLET_1_R, FILLET_1_R), FILLET_1_R, 180, 90)
            Line((0, FILLET_1_R), (0, 0))
            Line((0, 0), (FILLET_1_R, 0))
        make_face()
    extrude(amount=7.48, mode=Mode.SUBTRACT)
    with BuildSketch(Plane(origin=(-11.43, 0.347047613, 25.618724465), x_dir=(0, -0.9659258262889345, -0.25881904510301973), z_dir=(0, -0.25881904510301973, 0.9659258262889346)), Plane(origin=(11.43, 0.347047613, 25.618724465), x_dir=(-1, 0, 0), z_dir=(0, -0.25881904510301973, 0.9659258262889346))) as fillet_1_piece_9:
        with BuildLine():
            CenterArc((FILLET_1_R, FILLET_1_R), FILLET_1_R, 180, 90)
            Line((0, FILLET_1_R), (0, 0))
            Line((0, 0), (FILLET_1_R, 0))
        make_face()
    extrude(amount=6.369116978, mode=Mode.SUBTRACT)
    with BuildSketch(Plane(origin=(-11.43, -0.3, -5.698713574), x_dir=(0, -1, 0), z_dir=(0, 0, 1)), Plane(origin=(11.43, -0.3, 30.533539031), x_dir=(0, -1, 0), z_dir=(0, 0, -1))) as fillet_1_piece_10:
        with BuildLine():
            CenterArc((FILLET_1_R, FILLET_1_R), FILLET_1_R, 180, 90)
            Line((0, FILLET_1_R), (0, 0))
            Line((0, 0), (FILLET_1_R, 0))
        make_face()
    extrude(amount=36.232252605, mode=Mode.SUBTRACT)
    with BuildSketch(Plane(origin=(-11.43, -1.742709202, -10.620808995), x_dir=(0, -0.981627183447625, 0.1908089953767454), z_dir=(0, 0.1908089953767454, 0.981627183447625))) as fillet_1_piece_11:
        with BuildLine():
            CenterArc((FILLET_1_R, FILLET_1_R), FILLET_1_R, 180, 90)
            Line((0, FILLET_1_R), (0, 0))
            Line((0, 0), (FILLET_1_R, 0))
        make_face()
    extrude(amount=10.061012517, mode=Mode.SUBTRACT)
    with BuildSketch(Plane(origin=(10.43, -1.9, -11.43), x_dir=(0, -1, 0), z_dir=(-1, 0, 0))) as fillet_1_piece_12:
        with BuildLine():
            CenterArc((FILLET_1_R * 0.824336385817, FILLET_1_R), FILLET_1_R, 191, 79)
            Line((-FILLET_1_R * 0.15729079763, FILLET_1_R * 0.809191004623), (0, 0))
            Line((0, 0), (FILLET_1_R * 0.824336385817, 0))
        make_face()
    extrude(amount=20.86, mode=Mode.SUBTRACT)
    with BuildSketch(Plane(origin=(11.43, -1.742709202, -10.620808995), x_dir=(0, -0.981627183447625, 0.1908089953767454), z_dir=(0, 0.1908089953767454, 0.981627183447625))) as fillet_1_piece_13:
        with BuildLine():
            CenterArc((FILLET_1_R, -FILLET_1_R), FILLET_1_R, 90, 90)
            Line((0, -FILLET_1_R), (0, 0))
            Line((0, 0), (FILLET_1_R, 0))
        make_face()
    extrude(amount=10.061012517, mode=Mode.SUBTRACT)
    with BuildSketch(Plane(origin=(-10.43, -1.5, 32.512), x_dir=(0, -1, 0), z_dir=(1, 0, 0))) as fillet_1_piece_14:
        with BuildLine():
            CenterArc((FILLET_1_R * 0.767326987979, FILLET_1_R), FILLET_1_R, 195, 75)
            Line((-FILLET_1_R * 0.19859883831, FILLET_1_R * 0.741180954897), (0, 0))
            Line((0, 0), (FILLET_1_R * 0.767326987979, 0))
        make_face()
    extrude(amount=20.86, mode=Mode.SUBTRACT)
    with BuildSketch(Plane(origin=(11.43, -22.55, 33.300246972), x_dir=(0, 1, 0), z_dir=(0, 0, -1))) as fillet_1_piece_15:
        with BuildLine():
            CenterArc((FILLET_1_R * 0.315298788879, -FILLET_1_R), FILLET_1_R, 90, 35)
            Line((-FILLET_1_R * 0.258277647472, -FILLET_1_R * 0.180847955711), (0, 0))
            Line((0, 0), (FILLET_1_R * 0.315298788879, 0))
        make_face()
    extrude(amount=45.518493944, mode=Mode.SUBTRACT)
    with BuildSketch(Plane(origin=(-11.43, -22.55, 33.300246972), x_dir=(0, 1, 0), z_dir=(0, 0, -1))) as fillet_1_piece_16:
        with BuildLine():
            CenterArc((FILLET_1_R * 0.315298788879, FILLET_1_R), FILLET_1_R, 235, 35)
            Line((-FILLET_1_R * 0.258277647472, FILLET_1_R * 0.180847955711), (0, 0))
            Line((0, 0), (FILLET_1_R * 0.315298788879, 0))
        make_face()
    extrude(amount=45.518493944, mode=Mode.SUBTRACT)
    with BuildSketch(Plane(origin=(-12.529584924, -24.55, -11.43), x_dir=(0, 1, 0), z_dir=(1, 0, 0))) as fillet_1_piece_17:
        with BuildLine():
            CenterArc((FILLET_1_R, FILLET_1_R), FILLET_1_R, 180, 90)
            Line((0, FILLET_1_R), (0, 0))
            Line((0, 0), (FILLET_1_R, 0))
        make_face()
    extrude(amount=25.059169847, mode=Mode.SUBTRACT)


solid = part.part
